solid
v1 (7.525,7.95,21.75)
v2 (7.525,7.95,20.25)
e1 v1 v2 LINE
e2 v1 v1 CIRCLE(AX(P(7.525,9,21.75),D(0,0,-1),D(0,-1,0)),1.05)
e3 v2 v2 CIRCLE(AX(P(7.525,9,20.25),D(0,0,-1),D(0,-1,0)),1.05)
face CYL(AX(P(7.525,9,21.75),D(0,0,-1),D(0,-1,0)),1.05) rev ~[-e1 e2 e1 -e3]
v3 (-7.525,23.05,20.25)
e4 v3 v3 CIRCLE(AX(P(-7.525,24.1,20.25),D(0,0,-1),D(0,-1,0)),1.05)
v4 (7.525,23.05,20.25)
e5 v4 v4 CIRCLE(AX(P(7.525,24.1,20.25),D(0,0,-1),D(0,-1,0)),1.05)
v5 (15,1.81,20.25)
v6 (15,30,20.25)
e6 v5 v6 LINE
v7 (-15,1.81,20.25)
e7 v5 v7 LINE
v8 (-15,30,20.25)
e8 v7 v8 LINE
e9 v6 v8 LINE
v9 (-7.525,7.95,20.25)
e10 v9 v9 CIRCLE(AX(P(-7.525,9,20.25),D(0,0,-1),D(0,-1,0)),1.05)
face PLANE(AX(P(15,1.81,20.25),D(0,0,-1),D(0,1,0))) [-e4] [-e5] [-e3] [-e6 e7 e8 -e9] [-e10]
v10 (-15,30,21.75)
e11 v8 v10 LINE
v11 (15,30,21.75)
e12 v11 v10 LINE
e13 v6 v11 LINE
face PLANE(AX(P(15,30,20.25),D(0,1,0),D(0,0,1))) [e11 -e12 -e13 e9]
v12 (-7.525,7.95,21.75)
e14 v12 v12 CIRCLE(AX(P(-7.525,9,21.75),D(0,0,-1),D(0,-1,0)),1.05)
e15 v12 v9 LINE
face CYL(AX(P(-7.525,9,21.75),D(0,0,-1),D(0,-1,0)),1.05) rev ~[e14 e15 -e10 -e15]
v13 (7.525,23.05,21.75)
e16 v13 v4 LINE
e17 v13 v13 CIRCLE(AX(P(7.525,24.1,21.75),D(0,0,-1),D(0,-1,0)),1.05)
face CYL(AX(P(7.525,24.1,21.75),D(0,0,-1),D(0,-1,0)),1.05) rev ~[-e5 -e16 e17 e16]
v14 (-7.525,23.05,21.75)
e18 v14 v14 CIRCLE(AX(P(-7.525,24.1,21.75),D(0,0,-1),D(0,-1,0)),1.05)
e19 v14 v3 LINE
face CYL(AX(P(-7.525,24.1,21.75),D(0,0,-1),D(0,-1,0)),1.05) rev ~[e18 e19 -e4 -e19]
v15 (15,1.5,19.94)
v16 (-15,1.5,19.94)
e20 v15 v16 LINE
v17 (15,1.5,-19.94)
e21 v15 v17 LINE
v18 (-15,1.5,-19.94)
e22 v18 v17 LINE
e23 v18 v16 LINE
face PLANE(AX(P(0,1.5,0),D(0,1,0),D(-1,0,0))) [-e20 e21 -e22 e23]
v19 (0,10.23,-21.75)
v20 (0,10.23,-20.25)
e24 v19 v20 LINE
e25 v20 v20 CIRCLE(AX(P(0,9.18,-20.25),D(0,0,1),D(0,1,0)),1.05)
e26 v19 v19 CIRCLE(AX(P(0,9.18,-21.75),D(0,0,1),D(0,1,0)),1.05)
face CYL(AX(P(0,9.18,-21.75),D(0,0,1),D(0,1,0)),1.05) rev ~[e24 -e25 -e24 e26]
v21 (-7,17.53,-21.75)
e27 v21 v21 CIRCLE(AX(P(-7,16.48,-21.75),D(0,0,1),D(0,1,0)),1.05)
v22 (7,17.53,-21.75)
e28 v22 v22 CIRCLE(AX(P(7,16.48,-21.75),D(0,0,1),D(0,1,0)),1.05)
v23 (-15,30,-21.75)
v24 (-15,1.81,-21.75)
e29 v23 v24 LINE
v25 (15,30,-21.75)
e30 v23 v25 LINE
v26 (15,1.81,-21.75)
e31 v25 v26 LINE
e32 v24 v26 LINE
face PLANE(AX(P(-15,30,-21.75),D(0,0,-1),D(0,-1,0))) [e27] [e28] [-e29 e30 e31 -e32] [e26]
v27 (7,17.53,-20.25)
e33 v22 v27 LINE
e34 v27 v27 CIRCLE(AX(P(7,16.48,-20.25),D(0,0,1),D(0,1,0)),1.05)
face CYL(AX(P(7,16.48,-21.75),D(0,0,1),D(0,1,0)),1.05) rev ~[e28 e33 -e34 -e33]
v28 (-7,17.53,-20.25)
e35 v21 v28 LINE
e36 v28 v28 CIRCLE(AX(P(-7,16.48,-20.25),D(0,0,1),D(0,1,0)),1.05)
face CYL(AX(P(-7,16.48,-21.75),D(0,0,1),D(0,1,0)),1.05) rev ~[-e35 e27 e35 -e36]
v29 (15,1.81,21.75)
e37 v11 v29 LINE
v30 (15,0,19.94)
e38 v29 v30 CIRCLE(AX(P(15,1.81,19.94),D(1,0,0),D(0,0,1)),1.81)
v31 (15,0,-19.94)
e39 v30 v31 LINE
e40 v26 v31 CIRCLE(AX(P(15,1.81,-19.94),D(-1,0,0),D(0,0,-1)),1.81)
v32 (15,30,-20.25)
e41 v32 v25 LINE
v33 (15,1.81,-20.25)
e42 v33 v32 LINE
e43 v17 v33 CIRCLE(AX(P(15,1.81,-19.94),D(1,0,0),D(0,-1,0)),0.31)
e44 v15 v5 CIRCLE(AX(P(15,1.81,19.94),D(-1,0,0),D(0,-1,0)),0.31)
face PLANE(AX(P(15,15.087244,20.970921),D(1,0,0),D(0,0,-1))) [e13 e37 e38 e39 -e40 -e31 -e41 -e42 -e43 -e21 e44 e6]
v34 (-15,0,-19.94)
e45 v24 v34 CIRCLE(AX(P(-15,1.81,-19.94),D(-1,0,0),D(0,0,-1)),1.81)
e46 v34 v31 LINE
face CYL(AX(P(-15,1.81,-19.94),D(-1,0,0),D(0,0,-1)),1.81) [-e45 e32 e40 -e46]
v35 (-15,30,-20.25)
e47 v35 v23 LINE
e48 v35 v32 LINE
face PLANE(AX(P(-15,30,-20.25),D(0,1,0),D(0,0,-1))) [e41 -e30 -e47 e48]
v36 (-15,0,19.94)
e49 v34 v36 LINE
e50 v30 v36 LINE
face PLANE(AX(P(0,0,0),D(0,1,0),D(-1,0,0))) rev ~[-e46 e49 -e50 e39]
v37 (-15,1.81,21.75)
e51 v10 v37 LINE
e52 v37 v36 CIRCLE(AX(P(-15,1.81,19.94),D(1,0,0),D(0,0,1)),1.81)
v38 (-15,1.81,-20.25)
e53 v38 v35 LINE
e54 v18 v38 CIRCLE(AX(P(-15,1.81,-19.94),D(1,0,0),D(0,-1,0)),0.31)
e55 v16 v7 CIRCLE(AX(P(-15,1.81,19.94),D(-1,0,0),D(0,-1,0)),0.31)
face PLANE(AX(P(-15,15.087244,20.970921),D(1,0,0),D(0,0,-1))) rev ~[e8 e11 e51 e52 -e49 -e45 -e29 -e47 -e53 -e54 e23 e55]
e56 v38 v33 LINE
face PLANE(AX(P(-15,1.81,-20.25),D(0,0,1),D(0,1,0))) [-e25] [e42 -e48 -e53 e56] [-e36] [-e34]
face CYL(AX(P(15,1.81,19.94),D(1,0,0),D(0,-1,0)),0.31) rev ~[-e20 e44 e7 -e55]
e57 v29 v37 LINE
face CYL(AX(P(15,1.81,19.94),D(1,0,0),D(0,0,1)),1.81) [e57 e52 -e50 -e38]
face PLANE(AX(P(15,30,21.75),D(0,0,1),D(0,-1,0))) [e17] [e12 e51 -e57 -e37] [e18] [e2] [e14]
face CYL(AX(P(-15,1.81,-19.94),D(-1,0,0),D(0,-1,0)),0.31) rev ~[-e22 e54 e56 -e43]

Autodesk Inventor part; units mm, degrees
ref_plane "YZ Plane" through (0, 0, 0) normal (1, 0, 0) x (0, 1, 0)
ref_plane "XZ Plane" through (0, 0, 0) normal (0, 1, 0) x (-1, 0, 0)
ref_plane "XY Plane" through (0, 0, 0) normal (0, 0, 1) x (1, 0, 0)
sketch "Sketch1" plane through (0, 0, 0) normal (0, 1, 0) x (-1, 0, 0)
  line L0 (15, 20.25) -> (-15, 20.25)
  line L1 (-15, 20.25) -> (-15, -20.25)
  line L2 (-15, -20.25) -> (15, -20.25)
  line L3 (15, -20.25) -> (15, 20.25)
  line L4 (15, 20.25) -> (-15, -20.25) construction
  line L5 (-15, 20.25) -> (15, -20.25) construction
  point P0 (0, 0)
  dimension "d0" = 30
  dimension "d1" = 40.5
extrude "Plate1" add sketch "Sketch1" along normal blind 1.5
sketch "Sketch2" plane through (15, 0, 21.75) normal (0, 0, -1) x (-1, 0, 0)
  line L0 (30, 0) -> (0, 0)
  line L1 (0, 0) -> (0, 30)
  line L2 (0, 30) -> (30, 30)
  line L3 (30, 30) -> (30, 0)
edge flange "Flange1" height 30 angle 90 thickness 1.5 bend radius 0.31 thickness toward (0, 0, -1) relief tear relief width 1.5 relief depth 0.75 corner gap 0.31 corner form 0 edges at (0, 1.5, 20.25) (0, 1.5, -20.25) wall of the first edge with corners at (-15, 0, 21.75) (15, 0, 21.75) (15, 30, 21.75) (-15, 30, 21.75)
bend "Bend1"
corner "Corner1"
sketch "Sketch3" plane through (-15, 30, 21.75) normal (0, 0, 1) x (1, 0, 0)
  circle A0 centre (22.525, -21) radius 0.7835 projected
  circle A1 centre (22.525, -5.9) radius 0.7835 projected
  circle A2 centre (7.475, -21) radius 0.7835 projected
  circle A3 centre (7.475, -5.9) radius 0.7835 projected
  ellipse E0 centre (22.952, 14.482) end of major axis (23.818, 15.348) minor radius 1 (24.07, 14.7056) -> (23.1756, 15.6) ccw projected
  line L0 (6.8244, 15.6) -> (23.1756, 15.6) projected
  ellipse E1 centre (7.048, 14.482) end of major axis (6.182, 15.348) minor radius 1 (6.8244, 15.6) -> (5.93, 14.7056) ccw projected
  line L1 (5.93, -21.6056) -> (5.93, 14.7056) projected
  ellipse E2 centre (7.048, -21.382) end of major axis (6.182, -22.248) minor radius 1 (5.93, -21.6056) -> (6.8244, -22.5) ccw projected
  line L2 (23.1756, -22.5) -> (6.8244, -22.5) projected
  ellipse E3 centre (22.952, -21.382) end of major axis (23.818, -22.248) minor radius 1 (23.1756, -22.5) -> (24.07, -21.6056) ccw projected
  line L3 (24.07, 14.7056) -> (24.07, -21.6056) projected
  circle A4 centre (7.475, -21) radius 0.7835 projected
  circle A5 centre (22.525, -21) radius 0.7835 projected
  circle A6 centre (7.475, -5.9) radius 0.7835 projected
  circle A7 centre (22.525, -5.9) radius 0.7835 projected
  circle A8 centre (7.475, 14.1) radius 0.7835 projected
  circle A9 centre (22.525, 14.1) radius 0.7835 projected
  circle A10 centre (15, 6.6) radius 6.4 projected
  point P0 (15, -30)
hole "Hole1" at (7.525, 24.1, 21.75) at (7.525, 9, 21.75) at (-7.525, 9, 21.75) at (-7.525, 24.1, 21.75) direction (0, 0, -1) diameter 2.1 depth 1.5
sketch "Sketch4" plane through (15, 30, -21.75) normal (0, 0, -1) x (-1, 0, 0)
  circle A0 centre (15, -20.82) radius 0.7835 projected
  circle A1 centre (8, -13.52) radius 0.7835 projected
  circle A2 centre (22, -13.52) radius 0.7835 projected
  circle A3 centre (7, -0.3) radius 0.7835 projected
  circle A4 centre (23, -0.3) radius 0.7835 projected
  line L0 (21.07, -22.22) -> (8.93, -22.22) projected
  line L1 (21.07, -22.22) -> (21.07, -21.5) projected
  arc A5 (23.07, -19.5) -> (21.07, -21.5) centre (23.07, -21.5) ccw projected
  line L2 (23.07, -19.5) -> (23.79, -19.5) projected
  line L3 (23.79, 12.6) -> (23.79, -19.5) projected
  line L4 (23.79, 12.6) -> (23.07, 12.6) projected
  arc A6 (21.07, 14.6) -> (23.07, 12.6) centre (23.07, 14.6) ccw projected
  line L5 (21.07, 14.6) -> (21.07, 15.32) projected
  line L6 (8.93, 15.32) -> (21.07, 15.32) projected
  line L7 (8.93, 15.32) -> (8.93, 14.6) projected
  arc A7 (6.93, 12.6) -> (8.93, 14.6) centre (6.93, 14.6) ccw projected
  line L8 (6.93, 12.6) -> (6.21, 12.6) projected
  line L9 (6.21, -19.5) -> (6.21, 12.6) projected
  line L10 (6.21, -19.5) -> (6.93, -19.5) projected
  arc A8 (8.93, -21.5) -> (6.93, -19.5) centre (6.93, -21.5) ccw projected
  line L11 (8.93, -21.5) -> (8.93, -22.22) projected
  circle A9 centre (15, 6.6) radius 6.4 projected
  point P0 (15, -30)
hole "Hole2" at (-7, 16.48, -21.75) at (7, 16.48, -21.75) at (0, 9.18, -21.75) direction (0, 0, 1) diameter 2.1 depth 1.5
equation "\"d18\" = Thickness"
equation "\"d25\" = Thickness"
equation "\"d2\" = Thickness"
equation "\"d3\" = BendReliefWidth"
equation "\"d4\" = BendReliefDepth"
equation "\"d5\" = MinimumRemnant"
equation "\"d6\" = TransitionRadius"
equation "\"d9\" = BendRadius"
equation "\"d10\" = CornerReliefSize"
equation "\"d11\" = GapSize"
equation "\"d12\" = JacobiRadiusSize"
equation "\"BendReliefWidth\" = Thickness"
equation "\"BendReliefDepth\" = 0.5 * Thickness"
equation "\"CornerReliefSize\" = 4 * Thickness"
equation "\"MinimumRemnant\" = 2 * Thickness"
equation "\"TransitionRadius\" = BendRadius"
equation "\"JacobiRadiusSize\" = BendRadius"
equation "\"GapSize\" = Thickness"
equation "\"Thickness\" = 1.5"
equation "\"BendRadius\" = 0.31"
properties part number "HWFrame" material "Aluminum 6061-AHC"
